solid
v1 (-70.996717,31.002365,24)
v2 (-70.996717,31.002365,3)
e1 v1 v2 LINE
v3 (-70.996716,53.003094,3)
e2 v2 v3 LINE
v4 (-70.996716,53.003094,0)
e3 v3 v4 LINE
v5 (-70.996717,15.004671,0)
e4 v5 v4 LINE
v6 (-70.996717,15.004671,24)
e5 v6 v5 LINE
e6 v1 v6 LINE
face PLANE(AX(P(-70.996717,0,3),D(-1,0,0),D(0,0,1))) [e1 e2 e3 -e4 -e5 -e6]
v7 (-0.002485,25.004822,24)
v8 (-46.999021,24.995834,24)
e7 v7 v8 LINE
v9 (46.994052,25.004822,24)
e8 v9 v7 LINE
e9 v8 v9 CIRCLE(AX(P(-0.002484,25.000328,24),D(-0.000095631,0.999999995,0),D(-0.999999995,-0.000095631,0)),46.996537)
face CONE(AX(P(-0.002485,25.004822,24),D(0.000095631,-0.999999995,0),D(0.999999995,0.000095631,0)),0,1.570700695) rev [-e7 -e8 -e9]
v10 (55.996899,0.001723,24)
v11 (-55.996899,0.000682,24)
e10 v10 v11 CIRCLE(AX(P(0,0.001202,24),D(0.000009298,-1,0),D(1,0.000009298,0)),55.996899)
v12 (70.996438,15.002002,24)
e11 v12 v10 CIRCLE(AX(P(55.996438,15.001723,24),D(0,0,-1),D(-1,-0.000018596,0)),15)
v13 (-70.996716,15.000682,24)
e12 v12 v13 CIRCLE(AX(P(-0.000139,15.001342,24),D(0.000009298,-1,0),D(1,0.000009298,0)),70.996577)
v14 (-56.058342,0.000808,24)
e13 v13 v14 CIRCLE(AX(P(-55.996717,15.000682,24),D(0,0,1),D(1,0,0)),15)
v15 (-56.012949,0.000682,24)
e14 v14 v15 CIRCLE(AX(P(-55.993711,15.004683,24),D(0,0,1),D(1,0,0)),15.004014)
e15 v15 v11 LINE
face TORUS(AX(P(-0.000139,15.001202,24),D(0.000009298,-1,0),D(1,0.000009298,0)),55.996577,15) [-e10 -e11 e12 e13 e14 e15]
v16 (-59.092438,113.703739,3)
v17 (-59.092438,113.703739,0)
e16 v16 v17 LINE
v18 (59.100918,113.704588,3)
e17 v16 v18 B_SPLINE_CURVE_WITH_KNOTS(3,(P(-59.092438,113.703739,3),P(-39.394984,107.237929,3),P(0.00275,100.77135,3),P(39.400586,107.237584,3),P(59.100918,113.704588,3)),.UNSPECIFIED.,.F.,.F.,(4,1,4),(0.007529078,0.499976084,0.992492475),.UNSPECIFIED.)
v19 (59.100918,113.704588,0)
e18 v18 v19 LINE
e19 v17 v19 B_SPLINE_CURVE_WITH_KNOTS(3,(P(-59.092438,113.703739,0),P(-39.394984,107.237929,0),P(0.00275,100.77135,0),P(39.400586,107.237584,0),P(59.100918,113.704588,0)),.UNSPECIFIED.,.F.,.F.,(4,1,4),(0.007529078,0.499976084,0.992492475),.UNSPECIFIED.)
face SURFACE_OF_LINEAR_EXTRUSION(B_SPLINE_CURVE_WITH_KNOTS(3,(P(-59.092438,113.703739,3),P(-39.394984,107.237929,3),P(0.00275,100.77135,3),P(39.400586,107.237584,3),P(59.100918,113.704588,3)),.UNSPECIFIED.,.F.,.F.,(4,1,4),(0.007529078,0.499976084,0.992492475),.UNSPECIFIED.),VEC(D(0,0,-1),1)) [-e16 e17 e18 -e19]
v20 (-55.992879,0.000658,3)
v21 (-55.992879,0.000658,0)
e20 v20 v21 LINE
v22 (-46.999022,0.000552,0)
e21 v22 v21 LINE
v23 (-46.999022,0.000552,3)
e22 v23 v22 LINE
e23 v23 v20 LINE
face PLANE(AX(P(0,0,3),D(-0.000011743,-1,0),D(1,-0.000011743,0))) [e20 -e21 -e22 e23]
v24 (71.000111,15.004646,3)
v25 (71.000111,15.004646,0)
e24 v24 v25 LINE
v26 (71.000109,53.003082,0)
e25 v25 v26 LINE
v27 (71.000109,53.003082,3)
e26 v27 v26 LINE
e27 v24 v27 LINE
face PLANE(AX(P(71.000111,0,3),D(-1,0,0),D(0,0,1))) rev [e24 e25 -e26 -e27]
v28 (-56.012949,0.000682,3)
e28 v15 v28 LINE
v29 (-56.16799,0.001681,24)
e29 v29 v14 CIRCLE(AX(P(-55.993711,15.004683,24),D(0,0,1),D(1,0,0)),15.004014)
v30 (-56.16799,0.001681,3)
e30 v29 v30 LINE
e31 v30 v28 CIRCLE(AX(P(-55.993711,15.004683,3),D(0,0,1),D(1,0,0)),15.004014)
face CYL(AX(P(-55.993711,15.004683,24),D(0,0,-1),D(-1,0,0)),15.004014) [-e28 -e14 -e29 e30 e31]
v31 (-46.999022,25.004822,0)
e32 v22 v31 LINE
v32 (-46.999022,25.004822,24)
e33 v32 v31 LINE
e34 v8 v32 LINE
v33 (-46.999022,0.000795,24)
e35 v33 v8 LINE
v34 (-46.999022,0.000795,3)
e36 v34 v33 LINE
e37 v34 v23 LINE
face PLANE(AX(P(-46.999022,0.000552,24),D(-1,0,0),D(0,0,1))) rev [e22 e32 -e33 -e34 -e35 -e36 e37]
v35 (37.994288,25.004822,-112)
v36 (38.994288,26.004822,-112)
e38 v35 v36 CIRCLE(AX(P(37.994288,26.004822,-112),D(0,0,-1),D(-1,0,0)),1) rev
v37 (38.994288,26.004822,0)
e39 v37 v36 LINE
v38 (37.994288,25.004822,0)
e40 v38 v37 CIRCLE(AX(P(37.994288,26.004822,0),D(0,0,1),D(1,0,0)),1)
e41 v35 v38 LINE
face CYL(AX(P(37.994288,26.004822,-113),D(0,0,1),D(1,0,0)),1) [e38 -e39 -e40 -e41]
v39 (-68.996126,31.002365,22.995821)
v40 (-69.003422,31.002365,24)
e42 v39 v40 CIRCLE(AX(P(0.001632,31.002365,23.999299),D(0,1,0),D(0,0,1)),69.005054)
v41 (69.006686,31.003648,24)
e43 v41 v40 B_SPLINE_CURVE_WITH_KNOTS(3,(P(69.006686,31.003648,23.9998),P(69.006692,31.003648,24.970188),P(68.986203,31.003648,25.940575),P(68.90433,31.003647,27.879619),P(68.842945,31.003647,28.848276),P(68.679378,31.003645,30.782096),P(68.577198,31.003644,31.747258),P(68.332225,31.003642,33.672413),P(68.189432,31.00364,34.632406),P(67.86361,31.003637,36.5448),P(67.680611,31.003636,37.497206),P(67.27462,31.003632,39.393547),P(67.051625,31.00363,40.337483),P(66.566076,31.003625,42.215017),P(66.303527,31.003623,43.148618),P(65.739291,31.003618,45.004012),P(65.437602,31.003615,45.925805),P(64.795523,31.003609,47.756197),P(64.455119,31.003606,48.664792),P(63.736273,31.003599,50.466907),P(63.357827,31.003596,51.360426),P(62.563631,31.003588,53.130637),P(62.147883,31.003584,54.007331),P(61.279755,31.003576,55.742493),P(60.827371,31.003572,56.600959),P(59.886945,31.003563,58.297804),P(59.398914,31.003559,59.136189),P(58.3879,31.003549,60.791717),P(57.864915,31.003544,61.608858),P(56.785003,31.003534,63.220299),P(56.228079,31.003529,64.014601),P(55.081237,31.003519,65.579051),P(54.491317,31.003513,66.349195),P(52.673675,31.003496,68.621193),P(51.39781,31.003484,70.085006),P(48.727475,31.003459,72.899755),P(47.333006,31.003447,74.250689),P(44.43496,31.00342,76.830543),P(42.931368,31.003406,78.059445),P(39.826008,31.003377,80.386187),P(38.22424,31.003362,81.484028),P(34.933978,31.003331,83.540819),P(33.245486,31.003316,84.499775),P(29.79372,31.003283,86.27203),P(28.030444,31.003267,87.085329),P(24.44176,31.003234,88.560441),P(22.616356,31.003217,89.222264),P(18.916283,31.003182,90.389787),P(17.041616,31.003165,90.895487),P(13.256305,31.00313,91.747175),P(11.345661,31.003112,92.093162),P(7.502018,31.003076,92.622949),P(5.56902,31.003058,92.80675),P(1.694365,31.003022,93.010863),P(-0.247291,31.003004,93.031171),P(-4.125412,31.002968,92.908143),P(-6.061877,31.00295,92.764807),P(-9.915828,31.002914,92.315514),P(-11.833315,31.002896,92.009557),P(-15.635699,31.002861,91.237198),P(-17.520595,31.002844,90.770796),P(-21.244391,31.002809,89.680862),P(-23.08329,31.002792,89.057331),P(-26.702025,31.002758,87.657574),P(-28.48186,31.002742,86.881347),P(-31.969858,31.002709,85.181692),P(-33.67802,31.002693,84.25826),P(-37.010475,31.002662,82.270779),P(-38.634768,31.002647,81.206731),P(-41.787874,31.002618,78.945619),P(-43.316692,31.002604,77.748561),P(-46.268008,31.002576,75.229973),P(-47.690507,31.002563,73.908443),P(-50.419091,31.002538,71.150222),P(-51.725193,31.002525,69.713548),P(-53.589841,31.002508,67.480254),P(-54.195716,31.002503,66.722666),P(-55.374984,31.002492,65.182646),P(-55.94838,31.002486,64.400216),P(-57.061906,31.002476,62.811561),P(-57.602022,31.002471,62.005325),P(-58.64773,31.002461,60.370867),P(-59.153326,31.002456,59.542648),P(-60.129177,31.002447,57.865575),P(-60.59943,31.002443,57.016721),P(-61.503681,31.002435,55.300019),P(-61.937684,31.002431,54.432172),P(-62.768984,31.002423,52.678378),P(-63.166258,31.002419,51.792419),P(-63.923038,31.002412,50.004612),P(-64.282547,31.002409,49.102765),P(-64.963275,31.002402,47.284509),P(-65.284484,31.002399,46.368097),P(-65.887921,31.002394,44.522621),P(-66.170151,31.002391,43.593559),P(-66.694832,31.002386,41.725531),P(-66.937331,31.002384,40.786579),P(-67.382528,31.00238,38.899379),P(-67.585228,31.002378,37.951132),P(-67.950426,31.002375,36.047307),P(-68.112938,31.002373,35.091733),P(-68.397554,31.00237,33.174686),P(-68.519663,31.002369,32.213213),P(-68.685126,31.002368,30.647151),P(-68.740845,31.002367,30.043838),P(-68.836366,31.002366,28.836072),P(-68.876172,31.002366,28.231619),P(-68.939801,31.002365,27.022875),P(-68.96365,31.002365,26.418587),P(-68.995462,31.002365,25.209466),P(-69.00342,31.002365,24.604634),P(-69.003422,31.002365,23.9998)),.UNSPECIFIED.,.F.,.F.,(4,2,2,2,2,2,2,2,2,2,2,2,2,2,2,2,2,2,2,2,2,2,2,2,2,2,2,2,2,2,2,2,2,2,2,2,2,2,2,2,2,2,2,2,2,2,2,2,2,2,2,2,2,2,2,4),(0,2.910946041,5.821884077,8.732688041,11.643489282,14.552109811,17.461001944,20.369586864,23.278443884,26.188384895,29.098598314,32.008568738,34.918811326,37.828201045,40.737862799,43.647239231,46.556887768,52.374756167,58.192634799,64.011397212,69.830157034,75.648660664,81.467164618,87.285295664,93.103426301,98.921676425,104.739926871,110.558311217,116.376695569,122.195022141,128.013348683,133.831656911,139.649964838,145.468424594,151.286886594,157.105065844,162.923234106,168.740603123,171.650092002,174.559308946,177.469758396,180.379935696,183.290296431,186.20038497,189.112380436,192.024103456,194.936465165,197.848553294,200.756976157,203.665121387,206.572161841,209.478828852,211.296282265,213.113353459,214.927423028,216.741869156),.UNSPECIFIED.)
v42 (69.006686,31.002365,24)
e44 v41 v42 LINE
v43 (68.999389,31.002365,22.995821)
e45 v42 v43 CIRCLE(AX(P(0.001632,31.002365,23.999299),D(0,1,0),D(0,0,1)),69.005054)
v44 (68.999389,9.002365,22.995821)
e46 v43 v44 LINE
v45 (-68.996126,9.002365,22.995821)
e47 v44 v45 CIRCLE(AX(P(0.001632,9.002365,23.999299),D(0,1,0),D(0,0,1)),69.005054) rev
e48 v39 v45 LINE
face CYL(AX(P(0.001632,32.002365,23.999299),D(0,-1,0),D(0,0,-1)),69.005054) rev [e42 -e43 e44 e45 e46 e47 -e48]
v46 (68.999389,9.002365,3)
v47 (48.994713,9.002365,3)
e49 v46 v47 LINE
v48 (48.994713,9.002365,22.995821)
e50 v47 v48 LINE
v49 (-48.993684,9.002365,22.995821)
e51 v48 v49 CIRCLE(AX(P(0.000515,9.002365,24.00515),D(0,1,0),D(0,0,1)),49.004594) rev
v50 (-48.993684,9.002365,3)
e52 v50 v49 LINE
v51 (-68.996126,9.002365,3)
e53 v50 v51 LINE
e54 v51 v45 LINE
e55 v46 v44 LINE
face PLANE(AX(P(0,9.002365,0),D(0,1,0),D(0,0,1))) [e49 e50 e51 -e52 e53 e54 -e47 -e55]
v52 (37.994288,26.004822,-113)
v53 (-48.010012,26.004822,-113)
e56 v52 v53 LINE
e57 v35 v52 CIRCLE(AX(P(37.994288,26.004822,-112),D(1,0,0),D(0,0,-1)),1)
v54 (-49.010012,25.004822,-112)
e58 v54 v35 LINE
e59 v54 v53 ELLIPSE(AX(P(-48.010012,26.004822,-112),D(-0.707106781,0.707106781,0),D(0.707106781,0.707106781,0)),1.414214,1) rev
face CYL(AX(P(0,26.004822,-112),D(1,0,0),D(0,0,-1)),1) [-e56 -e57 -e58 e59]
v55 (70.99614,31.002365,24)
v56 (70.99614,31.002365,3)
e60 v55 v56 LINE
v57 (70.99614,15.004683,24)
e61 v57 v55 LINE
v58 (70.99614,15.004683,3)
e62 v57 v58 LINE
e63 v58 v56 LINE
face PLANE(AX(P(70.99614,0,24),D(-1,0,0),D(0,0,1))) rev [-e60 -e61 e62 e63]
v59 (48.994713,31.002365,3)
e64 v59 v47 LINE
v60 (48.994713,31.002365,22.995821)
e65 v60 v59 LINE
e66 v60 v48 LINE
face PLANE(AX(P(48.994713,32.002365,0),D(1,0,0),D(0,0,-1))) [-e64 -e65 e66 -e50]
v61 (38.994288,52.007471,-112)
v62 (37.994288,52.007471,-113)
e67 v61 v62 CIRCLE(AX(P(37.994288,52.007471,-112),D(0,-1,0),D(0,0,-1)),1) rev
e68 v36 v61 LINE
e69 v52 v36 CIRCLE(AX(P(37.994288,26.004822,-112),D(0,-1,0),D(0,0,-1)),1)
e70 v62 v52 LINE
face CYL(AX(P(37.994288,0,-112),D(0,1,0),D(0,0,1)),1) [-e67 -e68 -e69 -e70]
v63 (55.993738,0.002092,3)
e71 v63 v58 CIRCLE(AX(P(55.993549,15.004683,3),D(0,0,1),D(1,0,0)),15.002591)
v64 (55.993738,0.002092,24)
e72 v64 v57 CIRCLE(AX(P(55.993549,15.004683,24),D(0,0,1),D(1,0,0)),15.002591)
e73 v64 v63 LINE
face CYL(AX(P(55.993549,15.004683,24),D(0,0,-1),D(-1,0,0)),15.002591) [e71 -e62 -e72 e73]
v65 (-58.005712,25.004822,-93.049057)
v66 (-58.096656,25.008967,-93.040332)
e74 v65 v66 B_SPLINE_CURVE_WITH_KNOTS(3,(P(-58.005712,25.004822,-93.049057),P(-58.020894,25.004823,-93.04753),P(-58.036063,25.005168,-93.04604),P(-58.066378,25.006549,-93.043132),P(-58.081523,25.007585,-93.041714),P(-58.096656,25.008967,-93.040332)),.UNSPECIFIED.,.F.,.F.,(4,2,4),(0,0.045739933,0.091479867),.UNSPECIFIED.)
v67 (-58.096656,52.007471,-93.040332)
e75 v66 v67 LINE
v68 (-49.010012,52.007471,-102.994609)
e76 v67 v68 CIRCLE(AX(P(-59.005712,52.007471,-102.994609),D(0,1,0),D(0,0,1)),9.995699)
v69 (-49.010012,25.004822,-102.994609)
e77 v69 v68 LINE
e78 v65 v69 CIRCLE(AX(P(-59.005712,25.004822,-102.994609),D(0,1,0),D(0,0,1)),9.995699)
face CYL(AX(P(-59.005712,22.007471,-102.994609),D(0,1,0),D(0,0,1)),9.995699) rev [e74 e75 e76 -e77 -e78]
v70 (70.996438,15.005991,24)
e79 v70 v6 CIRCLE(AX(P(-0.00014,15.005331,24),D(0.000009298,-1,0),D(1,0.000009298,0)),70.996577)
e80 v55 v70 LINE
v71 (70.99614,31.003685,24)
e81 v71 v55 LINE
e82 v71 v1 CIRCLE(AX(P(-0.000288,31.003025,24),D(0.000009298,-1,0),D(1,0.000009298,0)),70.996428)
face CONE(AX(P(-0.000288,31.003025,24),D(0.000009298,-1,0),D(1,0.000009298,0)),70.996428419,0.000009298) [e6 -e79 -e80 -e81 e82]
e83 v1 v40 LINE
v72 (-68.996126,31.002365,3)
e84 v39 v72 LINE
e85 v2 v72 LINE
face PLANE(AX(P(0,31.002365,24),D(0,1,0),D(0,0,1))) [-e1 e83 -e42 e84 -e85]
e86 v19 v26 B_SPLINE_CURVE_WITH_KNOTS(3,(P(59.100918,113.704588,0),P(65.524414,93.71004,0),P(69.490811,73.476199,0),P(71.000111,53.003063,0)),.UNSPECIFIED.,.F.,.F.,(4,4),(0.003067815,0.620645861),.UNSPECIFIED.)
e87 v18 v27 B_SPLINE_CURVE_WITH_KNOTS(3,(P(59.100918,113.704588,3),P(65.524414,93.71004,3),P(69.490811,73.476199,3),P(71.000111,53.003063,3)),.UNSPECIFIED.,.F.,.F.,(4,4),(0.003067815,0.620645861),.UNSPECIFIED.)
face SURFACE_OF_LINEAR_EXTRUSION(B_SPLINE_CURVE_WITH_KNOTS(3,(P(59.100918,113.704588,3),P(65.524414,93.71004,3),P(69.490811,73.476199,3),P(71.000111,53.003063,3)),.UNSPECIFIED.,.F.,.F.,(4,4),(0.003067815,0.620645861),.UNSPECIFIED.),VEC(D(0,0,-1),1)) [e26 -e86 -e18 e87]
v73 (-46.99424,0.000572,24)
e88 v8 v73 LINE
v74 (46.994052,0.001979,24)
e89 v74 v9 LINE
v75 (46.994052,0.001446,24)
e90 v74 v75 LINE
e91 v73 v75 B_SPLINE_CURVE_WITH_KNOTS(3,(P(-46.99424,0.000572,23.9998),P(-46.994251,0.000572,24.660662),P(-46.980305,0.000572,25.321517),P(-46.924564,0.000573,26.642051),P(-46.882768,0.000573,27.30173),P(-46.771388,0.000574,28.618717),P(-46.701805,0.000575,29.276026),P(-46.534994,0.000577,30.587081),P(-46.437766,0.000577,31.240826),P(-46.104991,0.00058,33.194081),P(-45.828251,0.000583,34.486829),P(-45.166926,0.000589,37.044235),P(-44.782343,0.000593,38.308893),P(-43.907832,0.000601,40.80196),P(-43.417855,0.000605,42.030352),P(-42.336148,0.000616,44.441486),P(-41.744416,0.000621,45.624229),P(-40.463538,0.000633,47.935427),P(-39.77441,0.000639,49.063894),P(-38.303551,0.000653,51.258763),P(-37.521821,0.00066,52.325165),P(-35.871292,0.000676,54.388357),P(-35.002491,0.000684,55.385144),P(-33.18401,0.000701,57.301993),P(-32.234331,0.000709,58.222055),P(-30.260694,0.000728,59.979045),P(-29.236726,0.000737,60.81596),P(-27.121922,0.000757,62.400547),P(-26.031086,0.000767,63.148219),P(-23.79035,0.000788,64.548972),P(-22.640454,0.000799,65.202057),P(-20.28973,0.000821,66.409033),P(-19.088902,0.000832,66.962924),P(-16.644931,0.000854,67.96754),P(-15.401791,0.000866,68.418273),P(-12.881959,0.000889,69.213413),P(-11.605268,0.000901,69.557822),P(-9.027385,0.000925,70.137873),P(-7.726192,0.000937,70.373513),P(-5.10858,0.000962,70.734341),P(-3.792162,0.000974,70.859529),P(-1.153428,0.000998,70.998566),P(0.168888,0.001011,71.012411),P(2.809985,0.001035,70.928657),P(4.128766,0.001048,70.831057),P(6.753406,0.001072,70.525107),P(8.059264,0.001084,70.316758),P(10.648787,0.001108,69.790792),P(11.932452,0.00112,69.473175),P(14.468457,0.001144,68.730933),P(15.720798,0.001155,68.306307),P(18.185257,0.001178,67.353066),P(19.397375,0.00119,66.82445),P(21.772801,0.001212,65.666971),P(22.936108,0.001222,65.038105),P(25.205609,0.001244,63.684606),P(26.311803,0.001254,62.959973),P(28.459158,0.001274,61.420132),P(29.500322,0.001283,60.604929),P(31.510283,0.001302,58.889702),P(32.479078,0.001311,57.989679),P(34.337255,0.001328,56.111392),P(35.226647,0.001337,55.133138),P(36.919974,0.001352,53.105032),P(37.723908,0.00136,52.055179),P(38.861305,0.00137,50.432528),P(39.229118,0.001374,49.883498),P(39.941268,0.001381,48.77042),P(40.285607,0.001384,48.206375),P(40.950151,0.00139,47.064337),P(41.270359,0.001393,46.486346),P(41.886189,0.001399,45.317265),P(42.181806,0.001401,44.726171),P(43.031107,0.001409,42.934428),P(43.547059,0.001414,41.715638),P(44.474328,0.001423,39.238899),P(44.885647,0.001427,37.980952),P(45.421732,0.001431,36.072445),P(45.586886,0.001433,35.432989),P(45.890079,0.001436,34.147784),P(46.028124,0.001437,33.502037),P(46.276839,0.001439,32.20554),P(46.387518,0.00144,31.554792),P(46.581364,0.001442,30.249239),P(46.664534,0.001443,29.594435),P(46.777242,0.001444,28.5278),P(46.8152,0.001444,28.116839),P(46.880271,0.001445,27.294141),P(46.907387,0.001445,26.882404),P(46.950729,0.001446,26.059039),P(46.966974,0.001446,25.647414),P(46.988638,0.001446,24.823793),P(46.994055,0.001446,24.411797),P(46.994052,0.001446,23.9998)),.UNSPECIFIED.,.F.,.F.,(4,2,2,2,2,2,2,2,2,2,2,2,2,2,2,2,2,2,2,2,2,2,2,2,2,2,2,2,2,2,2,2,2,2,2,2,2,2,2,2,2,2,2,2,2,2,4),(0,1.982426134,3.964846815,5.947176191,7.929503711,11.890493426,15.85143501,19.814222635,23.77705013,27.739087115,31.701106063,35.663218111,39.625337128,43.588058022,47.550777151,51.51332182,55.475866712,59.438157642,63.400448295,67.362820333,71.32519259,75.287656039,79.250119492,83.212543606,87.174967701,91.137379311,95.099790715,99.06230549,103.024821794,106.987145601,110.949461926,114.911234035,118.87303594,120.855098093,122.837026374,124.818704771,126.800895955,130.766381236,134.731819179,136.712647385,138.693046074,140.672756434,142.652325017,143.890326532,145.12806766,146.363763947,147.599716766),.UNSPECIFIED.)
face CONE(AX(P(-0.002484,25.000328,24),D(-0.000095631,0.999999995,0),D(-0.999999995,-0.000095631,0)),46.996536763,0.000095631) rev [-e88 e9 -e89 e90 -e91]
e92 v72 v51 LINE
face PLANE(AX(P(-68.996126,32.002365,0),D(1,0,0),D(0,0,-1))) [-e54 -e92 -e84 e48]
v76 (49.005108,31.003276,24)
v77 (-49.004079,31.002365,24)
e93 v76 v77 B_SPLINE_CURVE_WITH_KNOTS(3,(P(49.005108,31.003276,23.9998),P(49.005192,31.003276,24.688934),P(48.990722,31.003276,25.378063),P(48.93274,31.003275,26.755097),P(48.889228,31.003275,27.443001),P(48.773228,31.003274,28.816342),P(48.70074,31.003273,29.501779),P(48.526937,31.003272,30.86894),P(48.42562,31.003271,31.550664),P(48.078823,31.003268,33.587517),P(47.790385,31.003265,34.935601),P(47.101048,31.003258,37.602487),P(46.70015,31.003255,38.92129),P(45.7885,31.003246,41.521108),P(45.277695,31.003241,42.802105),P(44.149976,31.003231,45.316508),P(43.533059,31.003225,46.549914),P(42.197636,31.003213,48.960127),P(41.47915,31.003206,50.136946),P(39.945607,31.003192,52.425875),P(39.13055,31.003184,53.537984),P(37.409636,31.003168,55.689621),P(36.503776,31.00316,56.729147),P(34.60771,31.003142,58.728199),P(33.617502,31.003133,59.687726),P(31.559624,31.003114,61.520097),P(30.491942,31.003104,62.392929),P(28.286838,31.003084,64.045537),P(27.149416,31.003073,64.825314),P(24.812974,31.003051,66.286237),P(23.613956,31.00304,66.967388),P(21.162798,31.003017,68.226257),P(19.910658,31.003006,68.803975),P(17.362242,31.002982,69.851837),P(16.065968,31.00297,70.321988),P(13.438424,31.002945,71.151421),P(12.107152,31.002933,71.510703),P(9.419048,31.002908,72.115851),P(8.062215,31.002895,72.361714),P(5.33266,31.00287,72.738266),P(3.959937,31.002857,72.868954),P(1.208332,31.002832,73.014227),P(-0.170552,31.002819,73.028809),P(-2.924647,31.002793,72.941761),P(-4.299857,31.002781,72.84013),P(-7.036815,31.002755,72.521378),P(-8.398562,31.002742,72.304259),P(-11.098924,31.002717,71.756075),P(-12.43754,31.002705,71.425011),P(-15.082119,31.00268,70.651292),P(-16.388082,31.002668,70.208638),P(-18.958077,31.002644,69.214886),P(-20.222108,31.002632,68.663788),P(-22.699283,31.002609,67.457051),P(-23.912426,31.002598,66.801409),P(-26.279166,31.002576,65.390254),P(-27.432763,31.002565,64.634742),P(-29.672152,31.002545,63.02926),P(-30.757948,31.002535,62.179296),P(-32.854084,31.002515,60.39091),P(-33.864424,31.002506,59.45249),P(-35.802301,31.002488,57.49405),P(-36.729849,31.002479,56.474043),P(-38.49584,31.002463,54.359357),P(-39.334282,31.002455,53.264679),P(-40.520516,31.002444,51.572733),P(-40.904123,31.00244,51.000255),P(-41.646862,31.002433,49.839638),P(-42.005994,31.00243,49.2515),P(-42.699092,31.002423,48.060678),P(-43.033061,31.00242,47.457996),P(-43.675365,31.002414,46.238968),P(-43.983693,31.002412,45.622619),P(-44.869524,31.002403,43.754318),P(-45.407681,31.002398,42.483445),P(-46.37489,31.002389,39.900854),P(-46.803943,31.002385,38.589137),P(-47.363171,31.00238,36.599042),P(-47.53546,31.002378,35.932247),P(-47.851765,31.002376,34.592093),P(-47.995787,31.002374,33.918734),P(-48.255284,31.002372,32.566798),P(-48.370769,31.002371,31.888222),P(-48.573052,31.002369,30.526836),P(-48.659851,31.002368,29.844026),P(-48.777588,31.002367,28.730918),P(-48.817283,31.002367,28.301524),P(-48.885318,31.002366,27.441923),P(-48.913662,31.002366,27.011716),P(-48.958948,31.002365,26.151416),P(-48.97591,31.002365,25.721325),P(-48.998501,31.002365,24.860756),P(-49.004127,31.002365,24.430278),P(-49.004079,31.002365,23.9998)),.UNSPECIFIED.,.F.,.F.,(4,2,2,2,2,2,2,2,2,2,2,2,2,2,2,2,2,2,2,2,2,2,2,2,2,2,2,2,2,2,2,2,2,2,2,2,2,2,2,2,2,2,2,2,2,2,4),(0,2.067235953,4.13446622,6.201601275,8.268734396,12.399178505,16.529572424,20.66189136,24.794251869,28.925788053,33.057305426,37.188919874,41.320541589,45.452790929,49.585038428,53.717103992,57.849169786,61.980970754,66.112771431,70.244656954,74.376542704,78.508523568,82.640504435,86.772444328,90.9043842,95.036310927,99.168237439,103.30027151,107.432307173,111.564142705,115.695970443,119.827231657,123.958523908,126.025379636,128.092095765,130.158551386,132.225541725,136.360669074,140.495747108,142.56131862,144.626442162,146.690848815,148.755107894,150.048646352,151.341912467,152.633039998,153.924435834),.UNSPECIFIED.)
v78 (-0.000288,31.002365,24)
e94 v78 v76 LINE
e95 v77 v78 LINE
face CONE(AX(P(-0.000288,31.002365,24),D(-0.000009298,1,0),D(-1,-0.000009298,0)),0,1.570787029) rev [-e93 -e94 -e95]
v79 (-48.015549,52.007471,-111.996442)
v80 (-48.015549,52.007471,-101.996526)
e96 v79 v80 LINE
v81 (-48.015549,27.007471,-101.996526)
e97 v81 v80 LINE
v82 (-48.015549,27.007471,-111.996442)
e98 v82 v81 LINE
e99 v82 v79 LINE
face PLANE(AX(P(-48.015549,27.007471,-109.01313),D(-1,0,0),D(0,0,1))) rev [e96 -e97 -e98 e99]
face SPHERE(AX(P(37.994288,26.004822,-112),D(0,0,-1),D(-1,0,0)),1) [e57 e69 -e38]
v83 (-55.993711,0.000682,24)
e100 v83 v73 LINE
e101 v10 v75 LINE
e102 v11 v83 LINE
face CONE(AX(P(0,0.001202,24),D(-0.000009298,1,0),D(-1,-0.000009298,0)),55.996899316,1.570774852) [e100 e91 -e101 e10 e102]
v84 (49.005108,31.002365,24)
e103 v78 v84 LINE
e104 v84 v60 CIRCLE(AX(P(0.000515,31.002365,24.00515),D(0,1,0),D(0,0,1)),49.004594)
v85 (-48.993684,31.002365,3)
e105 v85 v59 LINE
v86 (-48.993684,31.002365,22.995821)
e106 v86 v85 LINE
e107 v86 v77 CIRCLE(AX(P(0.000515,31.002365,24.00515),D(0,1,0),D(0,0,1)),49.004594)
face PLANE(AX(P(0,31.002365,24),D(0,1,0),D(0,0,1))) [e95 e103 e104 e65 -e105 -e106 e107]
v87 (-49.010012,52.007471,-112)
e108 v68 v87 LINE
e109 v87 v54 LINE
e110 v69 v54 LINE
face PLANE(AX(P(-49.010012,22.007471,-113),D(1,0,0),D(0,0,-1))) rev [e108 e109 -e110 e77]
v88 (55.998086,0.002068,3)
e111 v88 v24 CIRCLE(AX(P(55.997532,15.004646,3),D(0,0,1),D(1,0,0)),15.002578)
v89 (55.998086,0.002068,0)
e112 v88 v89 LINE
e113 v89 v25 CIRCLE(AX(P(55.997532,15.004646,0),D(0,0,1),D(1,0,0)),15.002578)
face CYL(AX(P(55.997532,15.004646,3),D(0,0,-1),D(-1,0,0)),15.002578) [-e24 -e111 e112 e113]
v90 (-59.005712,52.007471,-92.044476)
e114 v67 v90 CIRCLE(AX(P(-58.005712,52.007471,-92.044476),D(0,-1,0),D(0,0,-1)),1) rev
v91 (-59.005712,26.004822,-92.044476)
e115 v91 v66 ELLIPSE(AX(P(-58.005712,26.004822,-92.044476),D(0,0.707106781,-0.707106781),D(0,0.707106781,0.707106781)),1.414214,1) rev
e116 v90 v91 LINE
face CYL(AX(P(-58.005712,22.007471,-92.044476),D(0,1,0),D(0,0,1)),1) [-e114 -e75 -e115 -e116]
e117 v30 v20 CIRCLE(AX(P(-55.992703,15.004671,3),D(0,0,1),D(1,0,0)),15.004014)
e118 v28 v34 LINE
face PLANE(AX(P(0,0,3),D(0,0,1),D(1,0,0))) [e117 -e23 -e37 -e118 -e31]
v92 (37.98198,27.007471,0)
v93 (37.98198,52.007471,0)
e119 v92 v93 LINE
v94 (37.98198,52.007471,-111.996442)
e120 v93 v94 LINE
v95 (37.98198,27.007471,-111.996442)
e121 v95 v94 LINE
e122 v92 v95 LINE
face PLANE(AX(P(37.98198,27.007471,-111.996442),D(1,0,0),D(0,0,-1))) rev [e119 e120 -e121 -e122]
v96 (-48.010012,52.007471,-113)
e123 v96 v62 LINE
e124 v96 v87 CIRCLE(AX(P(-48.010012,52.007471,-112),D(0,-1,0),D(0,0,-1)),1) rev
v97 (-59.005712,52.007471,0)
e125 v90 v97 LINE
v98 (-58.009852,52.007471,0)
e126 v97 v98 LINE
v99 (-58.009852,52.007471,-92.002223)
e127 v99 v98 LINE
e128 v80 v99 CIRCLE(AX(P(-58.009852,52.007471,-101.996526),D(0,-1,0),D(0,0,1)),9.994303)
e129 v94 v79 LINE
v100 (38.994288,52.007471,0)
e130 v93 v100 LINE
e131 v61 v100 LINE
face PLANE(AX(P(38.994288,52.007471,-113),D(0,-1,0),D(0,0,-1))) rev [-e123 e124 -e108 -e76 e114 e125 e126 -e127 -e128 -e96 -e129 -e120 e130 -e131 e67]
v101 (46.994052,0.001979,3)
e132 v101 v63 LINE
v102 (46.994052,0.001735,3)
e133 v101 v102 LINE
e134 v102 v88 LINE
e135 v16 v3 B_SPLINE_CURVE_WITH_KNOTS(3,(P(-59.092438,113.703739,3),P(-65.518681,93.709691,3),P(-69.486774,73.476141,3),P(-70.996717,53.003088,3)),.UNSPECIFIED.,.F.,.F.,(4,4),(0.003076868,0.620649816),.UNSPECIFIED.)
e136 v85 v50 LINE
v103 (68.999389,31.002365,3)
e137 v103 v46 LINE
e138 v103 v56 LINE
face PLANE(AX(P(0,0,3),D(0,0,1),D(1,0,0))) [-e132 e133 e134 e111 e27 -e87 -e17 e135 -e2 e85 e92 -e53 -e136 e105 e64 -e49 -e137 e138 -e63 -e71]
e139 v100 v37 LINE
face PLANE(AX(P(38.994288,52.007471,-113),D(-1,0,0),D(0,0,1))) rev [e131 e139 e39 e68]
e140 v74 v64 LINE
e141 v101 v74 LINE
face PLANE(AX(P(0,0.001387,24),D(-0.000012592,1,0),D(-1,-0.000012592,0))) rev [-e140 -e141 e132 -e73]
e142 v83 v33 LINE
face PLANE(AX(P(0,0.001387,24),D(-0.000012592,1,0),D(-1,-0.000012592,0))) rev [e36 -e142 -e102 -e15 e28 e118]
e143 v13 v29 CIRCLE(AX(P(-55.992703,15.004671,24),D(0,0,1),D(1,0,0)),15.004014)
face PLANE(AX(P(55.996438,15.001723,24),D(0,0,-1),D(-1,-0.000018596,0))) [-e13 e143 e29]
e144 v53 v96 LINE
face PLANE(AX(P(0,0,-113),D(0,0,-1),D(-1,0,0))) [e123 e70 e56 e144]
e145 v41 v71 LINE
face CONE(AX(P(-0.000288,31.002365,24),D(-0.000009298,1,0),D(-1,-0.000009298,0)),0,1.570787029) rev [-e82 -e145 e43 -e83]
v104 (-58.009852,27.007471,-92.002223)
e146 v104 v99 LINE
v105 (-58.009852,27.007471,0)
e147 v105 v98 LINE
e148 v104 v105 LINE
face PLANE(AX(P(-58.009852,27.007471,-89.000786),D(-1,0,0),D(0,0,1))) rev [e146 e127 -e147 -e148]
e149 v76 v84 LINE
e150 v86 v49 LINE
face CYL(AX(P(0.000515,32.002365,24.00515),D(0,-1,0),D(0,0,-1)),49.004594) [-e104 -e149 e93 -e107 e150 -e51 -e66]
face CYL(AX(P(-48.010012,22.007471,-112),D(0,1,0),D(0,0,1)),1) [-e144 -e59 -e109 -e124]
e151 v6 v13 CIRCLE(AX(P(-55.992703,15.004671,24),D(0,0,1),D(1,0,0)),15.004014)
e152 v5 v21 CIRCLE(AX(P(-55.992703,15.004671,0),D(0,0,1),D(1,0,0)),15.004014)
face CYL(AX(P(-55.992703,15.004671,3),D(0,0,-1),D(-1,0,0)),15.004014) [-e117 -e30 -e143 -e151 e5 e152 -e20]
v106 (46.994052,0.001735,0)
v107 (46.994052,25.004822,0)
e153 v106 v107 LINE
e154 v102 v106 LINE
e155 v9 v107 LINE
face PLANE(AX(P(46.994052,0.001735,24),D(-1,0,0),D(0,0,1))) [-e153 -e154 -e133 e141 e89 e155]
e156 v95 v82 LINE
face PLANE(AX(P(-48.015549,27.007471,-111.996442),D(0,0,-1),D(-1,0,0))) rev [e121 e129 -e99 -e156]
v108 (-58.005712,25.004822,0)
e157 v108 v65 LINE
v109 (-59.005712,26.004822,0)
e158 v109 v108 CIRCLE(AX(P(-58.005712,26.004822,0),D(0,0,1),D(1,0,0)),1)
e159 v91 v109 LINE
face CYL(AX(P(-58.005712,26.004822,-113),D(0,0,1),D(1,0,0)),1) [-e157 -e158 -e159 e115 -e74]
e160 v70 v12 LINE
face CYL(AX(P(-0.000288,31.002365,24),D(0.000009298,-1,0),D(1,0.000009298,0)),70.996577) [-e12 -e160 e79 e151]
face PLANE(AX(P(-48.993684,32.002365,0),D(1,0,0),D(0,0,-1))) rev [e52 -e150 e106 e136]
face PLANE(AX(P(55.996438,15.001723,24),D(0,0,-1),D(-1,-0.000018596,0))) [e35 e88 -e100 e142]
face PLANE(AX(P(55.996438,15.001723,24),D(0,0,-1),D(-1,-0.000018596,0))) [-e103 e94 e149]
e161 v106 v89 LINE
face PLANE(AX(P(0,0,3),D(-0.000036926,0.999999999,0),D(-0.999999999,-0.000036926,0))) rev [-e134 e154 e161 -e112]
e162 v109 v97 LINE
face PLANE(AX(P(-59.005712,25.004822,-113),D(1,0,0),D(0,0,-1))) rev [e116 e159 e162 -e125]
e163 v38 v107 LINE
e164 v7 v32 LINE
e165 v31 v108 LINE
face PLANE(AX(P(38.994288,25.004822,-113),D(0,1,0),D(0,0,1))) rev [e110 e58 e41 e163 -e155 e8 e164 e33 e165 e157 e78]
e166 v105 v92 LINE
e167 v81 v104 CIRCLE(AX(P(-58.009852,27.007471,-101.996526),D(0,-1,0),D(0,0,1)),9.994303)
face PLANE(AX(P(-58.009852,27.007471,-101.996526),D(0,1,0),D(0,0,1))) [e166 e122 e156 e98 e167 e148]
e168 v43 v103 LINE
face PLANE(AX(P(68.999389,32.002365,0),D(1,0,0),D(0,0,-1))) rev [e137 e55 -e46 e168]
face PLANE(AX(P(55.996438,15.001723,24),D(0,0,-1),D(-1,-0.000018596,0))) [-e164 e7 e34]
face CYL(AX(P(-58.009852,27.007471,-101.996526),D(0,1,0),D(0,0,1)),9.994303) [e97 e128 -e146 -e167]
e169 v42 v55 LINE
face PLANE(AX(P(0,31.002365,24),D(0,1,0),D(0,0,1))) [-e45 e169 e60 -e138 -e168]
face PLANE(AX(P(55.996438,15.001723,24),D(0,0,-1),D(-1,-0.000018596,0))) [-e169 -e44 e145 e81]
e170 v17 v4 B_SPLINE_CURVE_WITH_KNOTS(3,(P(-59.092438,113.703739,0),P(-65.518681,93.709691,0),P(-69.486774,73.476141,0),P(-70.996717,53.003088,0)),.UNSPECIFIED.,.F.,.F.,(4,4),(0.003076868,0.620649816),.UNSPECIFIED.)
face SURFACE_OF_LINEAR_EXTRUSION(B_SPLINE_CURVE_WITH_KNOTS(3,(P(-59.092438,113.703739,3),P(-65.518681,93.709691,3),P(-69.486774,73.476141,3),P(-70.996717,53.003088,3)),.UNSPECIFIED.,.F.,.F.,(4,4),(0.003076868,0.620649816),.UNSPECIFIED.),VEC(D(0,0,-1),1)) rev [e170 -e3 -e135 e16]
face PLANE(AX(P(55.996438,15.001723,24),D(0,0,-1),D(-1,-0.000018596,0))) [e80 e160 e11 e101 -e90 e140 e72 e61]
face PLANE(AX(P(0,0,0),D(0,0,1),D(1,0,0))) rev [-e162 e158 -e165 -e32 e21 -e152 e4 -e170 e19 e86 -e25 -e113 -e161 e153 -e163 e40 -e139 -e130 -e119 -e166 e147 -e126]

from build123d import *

# Parameters (mm, degrees)
BOSS_EXTRUDE2_DEPTH      = 3
SKETCH14_W               = 98
SKETCH14_H               = 27.00264841
BOSS_EXTRUDE4_DEPTH      = 113
CUT_EXTRUDE11_DEPTH      = 25
BOSS_EXTRUDE5_DEPTH      = 21
REVOLVE1_ANGLE           = 180
CUT_EXTRUDE15_DEPTH      = 1
CUT_EXTRUDE15_DEPTH_BACK = 22
CUT_EXTRUDE14_DEPTH      = 24
CUT_REVOLVE2_ANGLE       = 180
CUT_EXTRUDE16_DEPTH      = 30
FILLET1_R                = 1


# Read off the part's stored shape, not the designer's step: Boss-Extrude5
with BuildPart() as part:
    # Sketch1 → Boss-Extrude2 (new body)
    with BuildSketch(Plane.XY):
        with BuildLine():
            Line((0, 0), (-55.99287927, 0.000657501))
            ThreePointArc((-55.99287927, 0.000657501), (-66.60214284, 4.395231334), (-70.996716676, 15.00467109))
            Line((-70.996716676, 15.00467109), (-70.996716676, 53.003088443))
            add(Edge.make_bspline(
                [(-59.092437552, 113.703738569), (-65.518680916, 93.709690833), (-69.486773958, 73.476140791), (-70.996716676, 53.003088443)],
                knots=[0.003076868, 0.003076868, 0.003076868, 0.003076868, 0.620649816, 0.620649816, 0.620649816, 0.620649816], degree=3))
            add(Edge.make_bspline(
                [(-59.092437552, 113.703738569), (-39.394984135, 107.237929235), (0.002749603, 100.771350363), (39.400586429, 107.237584193), (59.100918302, 113.704587579)],
                knots=[0.007529078, 0.007529078, 0.007529078, 0.007529078, 0.499976084, 0.992492475, 0.992492475, 0.992492475, 0.992492475], degree=3))
            add(Edge.make_bspline(
                [(59.100918302, 113.704587579), (65.524413648, 93.710040003), (69.490811091, 73.476198601), (71.000110633, 53.003063374)],
                knots=[0.003067815, 0.003067815, 0.003067815, 0.003067815, 0.620645861, 0.620645861, 0.620645861, 0.620645861], degree=3))
            Line((71.000110633, 53.003063374), (71.000110633, 15.004646021))
            ThreePointArc((71.000110633, 15.004646021), (66.605957202, 4.396221214), (55.998086385, 0.002067804))
            Line((55.998086385, 0.002067804), (0, 0))
        make_face()
    extrude(amount=BOSS_EXTRUDE2_DEPTH)

    # Sketch14 → Boss-Extrude4 (add)
    with BuildSketch(Plane(origin=(0, 0, 0), x_dir=(-1, 0, 0), z_dir=(0, 0, -1))):
        with Locations((10.005711619, 38.506146673)):
            Rectangle(SKETCH14_W, SKETCH14_H)
    extrude(amount=BOSS_EXTRUDE4_DEPTH)

    # Sketch17 → Cut-Extrude11 (cut)
    with BuildSketch(Plane(origin=(0, 52.007470878, 0), x_dir=(1, 0, 0), z_dir=(0, 1, 0))):
        with BuildLine():
            Line((-48.015549057, 109.013130471), (-48.015549057, 101.996525982))
            ThreePointArc((-48.015549057, 101.996525982), (-50.942812726, 94.929486331), (-58.009852377, 92.002222662))
            Line((-58.009852377, 92.002222662), (-58.009852377, 89.000786475))
            Line((-58.009852377, 89.000786475), (-58.009852377, 0))
            Line((-58.009852377, 0), (37.981980496, 0))
            Line((37.981980496, 0), (37.981980496, 111.996441685))
            Line((37.981980496, 111.996441685), (-48.015549057, 111.996441685))
            Line((-48.015549057, 111.996441685), (-48.015549057, 109.013130471))
        make_face()
    extrude(amount=-CUT_EXTRUDE11_DEPTH, mode=Mode.SUBTRACT)

    # Boss-Extrude5 outline → Boss-Extrude5 (add)
    with BuildSketch(Plane.XY.offset(3)):
        with BuildLine():
            Line((70.996140169, 31.00236483), (-70.996716676, 31.00236483))
            Line((-70.996716676, 31.00236483), (-70.996716676, 15.00467109))
            ThreePointArc((-70.996716676, 15.00467109), (-66.602205131, 4.395293626), (-55.99287927, 0.0006575))
            Line((-55.99287927, 0.0006575), (55.993738248, 0.002091992))
            ThreePointArc((55.993738248, 0.002091992), (66.60204984, 4.396315904), (70.996140169, 15.004682829))
            Line((70.996140169, 15.004682829), (70.996140169, 31.00236483))
        make_face()
    extrude(amount=BOSS_EXTRUDE5_DEPTH)

    # Sketch23 → Revolve1 (revolve)
    with BuildSketch(Plane.XY.offset(24)):
        with BuildLine():
            Line((-0.000288253, 31.00236483), (0, 0))
            Line((0, 0), (-55.996899325, 0.000681852))
            ThreePointArc((-55.996899325, 0.000681852), (-66.603382969, 4.39414471), (-70.996716676, 15.000681851))
            Line((-70.996716676, 15.000681851), (-70.996716676, 15.00467109))
            Line((-70.996716676, 15.00467109), (-70.996716676, 31.00236483))
            Line((-70.996716676, 31.00236483), (-0.000288253, 31.00236483))
        make_face()
    revolve(axis=Axis((-0.000288253, 31.00236483, 24), (-9.297785566939823e-06, 0.9999999999567756, 0)), revolution_arc=REVOLVE1_ANGLE)

    # Sketch24 → Cut-Extrude15 (cut, two sides: drawn at the far end of the back side and taken through both)
    with BuildSketch(Plane(origin=(0, 31.00236483, 0), x_dir=(1, 0, 0), z_dir=(0, 1, 0)).offset(-CUT_EXTRUDE15_DEPTH_BACK)):
        with BuildLine():
            Line((68.999389406, -3), (48.994713166, -3))
            Line((48.994713166, -3), (48.994713166, -22.995821368))
            ThreePointArc((48.994713166, -22.995821368), (49.002483122, -23.497884055), (49.005108381, -24))
            Line((49.005108381, -24), (69.006686122, -24))
            ThreePointArc((69.006686122, -24), (69.004864469, -23.497897411), (68.999389406, -22.995821368))
            Line((68.999389406, -22.995821368), (68.999389406, -3))
        make_face()
        with BuildLine():
            Line((-49.004079193, -24), (-69.003422409, -24))
            ThreePointArc((-69.003422409, -24), (0.001631857, -93.004353523), (69.006686122, -24))
            Line((69.006686122, -24), (49.005108381, -24))
            ThreePointArc((49.005108381, -24), (34.65421123, -58.654415118), (0.001631857, -73.009744406))
            ThreePointArc((0.001631857, -73.009744406), (-34.65239206, -58.655205184), (-49.004079193, -24))
        make_face()
        with BuildLine():
            Line((-48.993683978, -3), (-68.996125693, -3))
            Line((-68.996125693, -3), (-68.996125693, -22.995821368))
            ThreePointArc((-68.996125693, -22.995821368), (-69.001600755, -23.497897411), (-69.003422409, -24))
            Line((-69.003422409, -24), (-49.004079193, -24))
            ThreePointArc((-49.004079193, -24), (-49.001453934, -23.497884055), (-48.993683978, -22.995821368))
            Line((-48.993683978, -22.995821368), (-48.993683978, -3))
        make_face()
    extrude(amount=CUT_EXTRUDE15_DEPTH + CUT_EXTRUDE15_DEPTH_BACK, mode=Mode.SUBTRACT)

    # Sketch21 → Cut-Extrude14 (cut)
    with BuildSketch(Plane(origin=(0, 0, 0), x_dir=(-1, 0, 0), z_dir=(0, 0, -1))):
        Polygon((-46.994052442, 0.001735318), (-46.994052442, 25.004822468), (0, 25.004822468), (46.999021514, 25.004822468), (46.999021514, 0.000551889), (0, 0), align=None)
    extrude(amount=-CUT_EXTRUDE14_DEPTH, mode=Mode.SUBTRACT)

    # Sketch26 → Cut-Revolve2 (revolve, cut)
    with BuildSketch(Plane(origin=(0, 0, 24), x_dir=(-1, 0, 0), z_dir=(0, 0, -1))):
        Polygon((-46.994052442, 25.004822468), (0.002484536, 25.004822468), (0, -0.975536805), (-46.994052442, -0.975536805), (-46.994052442, 0.001735318), align=None)
    revolve(axis=Axis((0, -0.975536805, 24), (9.56313097373021e-05, -0.9999999954273263, 0)), revolution_arc=CUT_REVOLVE2_ANGLE, mode=Mode.SUBTRACT)

    # Sketch27 → Cut-Extrude16 (cut)
    with BuildSketch(Plane(origin=(0, 52.007470878, 0), x_dir=(1, 0, 0), z_dir=(0, 1, 0))):
        with BuildLine():
            Line((-49.010012163, 113), (-49.010012163, 102.994608886))
            ThreePointArc((-49.010012163, 102.994608886), (-66.073738487, 95.926582018), (-59.005711619, 112.990308342))
            Line((-59.005711619, 112.990308342), (-59.005711619, 113.493786648))
            Line((-59.005711619, 113.493786648), (-49.010012163, 113.493786648))
            Line((-49.010012163, 113.493786648), (-49.010012163, 113))
        make_face()
    extrude(amount=-CUT_EXTRUDE16_DEPTH, mode=Mode.SUBTRACT)

    # Fillet1
    fillet1_edges = [part.edges().sort_by_distance(p)[0] for p in [
        (-49.010012163, 38.506146673, -113),
        (-59.005711619, 25.004822468, -46.499454715),
        (-59.005711619, 38.506146673, -92.99890943),
        (38.994288381, 25.004822468, -56.5),
        (38.994288381, 38.506146673, -113),
        (-5.007861891, 25.004822468, -113),
    ]]
    fillet(fillet1_edges, radius=FILLET1_R)


solid = part.part
